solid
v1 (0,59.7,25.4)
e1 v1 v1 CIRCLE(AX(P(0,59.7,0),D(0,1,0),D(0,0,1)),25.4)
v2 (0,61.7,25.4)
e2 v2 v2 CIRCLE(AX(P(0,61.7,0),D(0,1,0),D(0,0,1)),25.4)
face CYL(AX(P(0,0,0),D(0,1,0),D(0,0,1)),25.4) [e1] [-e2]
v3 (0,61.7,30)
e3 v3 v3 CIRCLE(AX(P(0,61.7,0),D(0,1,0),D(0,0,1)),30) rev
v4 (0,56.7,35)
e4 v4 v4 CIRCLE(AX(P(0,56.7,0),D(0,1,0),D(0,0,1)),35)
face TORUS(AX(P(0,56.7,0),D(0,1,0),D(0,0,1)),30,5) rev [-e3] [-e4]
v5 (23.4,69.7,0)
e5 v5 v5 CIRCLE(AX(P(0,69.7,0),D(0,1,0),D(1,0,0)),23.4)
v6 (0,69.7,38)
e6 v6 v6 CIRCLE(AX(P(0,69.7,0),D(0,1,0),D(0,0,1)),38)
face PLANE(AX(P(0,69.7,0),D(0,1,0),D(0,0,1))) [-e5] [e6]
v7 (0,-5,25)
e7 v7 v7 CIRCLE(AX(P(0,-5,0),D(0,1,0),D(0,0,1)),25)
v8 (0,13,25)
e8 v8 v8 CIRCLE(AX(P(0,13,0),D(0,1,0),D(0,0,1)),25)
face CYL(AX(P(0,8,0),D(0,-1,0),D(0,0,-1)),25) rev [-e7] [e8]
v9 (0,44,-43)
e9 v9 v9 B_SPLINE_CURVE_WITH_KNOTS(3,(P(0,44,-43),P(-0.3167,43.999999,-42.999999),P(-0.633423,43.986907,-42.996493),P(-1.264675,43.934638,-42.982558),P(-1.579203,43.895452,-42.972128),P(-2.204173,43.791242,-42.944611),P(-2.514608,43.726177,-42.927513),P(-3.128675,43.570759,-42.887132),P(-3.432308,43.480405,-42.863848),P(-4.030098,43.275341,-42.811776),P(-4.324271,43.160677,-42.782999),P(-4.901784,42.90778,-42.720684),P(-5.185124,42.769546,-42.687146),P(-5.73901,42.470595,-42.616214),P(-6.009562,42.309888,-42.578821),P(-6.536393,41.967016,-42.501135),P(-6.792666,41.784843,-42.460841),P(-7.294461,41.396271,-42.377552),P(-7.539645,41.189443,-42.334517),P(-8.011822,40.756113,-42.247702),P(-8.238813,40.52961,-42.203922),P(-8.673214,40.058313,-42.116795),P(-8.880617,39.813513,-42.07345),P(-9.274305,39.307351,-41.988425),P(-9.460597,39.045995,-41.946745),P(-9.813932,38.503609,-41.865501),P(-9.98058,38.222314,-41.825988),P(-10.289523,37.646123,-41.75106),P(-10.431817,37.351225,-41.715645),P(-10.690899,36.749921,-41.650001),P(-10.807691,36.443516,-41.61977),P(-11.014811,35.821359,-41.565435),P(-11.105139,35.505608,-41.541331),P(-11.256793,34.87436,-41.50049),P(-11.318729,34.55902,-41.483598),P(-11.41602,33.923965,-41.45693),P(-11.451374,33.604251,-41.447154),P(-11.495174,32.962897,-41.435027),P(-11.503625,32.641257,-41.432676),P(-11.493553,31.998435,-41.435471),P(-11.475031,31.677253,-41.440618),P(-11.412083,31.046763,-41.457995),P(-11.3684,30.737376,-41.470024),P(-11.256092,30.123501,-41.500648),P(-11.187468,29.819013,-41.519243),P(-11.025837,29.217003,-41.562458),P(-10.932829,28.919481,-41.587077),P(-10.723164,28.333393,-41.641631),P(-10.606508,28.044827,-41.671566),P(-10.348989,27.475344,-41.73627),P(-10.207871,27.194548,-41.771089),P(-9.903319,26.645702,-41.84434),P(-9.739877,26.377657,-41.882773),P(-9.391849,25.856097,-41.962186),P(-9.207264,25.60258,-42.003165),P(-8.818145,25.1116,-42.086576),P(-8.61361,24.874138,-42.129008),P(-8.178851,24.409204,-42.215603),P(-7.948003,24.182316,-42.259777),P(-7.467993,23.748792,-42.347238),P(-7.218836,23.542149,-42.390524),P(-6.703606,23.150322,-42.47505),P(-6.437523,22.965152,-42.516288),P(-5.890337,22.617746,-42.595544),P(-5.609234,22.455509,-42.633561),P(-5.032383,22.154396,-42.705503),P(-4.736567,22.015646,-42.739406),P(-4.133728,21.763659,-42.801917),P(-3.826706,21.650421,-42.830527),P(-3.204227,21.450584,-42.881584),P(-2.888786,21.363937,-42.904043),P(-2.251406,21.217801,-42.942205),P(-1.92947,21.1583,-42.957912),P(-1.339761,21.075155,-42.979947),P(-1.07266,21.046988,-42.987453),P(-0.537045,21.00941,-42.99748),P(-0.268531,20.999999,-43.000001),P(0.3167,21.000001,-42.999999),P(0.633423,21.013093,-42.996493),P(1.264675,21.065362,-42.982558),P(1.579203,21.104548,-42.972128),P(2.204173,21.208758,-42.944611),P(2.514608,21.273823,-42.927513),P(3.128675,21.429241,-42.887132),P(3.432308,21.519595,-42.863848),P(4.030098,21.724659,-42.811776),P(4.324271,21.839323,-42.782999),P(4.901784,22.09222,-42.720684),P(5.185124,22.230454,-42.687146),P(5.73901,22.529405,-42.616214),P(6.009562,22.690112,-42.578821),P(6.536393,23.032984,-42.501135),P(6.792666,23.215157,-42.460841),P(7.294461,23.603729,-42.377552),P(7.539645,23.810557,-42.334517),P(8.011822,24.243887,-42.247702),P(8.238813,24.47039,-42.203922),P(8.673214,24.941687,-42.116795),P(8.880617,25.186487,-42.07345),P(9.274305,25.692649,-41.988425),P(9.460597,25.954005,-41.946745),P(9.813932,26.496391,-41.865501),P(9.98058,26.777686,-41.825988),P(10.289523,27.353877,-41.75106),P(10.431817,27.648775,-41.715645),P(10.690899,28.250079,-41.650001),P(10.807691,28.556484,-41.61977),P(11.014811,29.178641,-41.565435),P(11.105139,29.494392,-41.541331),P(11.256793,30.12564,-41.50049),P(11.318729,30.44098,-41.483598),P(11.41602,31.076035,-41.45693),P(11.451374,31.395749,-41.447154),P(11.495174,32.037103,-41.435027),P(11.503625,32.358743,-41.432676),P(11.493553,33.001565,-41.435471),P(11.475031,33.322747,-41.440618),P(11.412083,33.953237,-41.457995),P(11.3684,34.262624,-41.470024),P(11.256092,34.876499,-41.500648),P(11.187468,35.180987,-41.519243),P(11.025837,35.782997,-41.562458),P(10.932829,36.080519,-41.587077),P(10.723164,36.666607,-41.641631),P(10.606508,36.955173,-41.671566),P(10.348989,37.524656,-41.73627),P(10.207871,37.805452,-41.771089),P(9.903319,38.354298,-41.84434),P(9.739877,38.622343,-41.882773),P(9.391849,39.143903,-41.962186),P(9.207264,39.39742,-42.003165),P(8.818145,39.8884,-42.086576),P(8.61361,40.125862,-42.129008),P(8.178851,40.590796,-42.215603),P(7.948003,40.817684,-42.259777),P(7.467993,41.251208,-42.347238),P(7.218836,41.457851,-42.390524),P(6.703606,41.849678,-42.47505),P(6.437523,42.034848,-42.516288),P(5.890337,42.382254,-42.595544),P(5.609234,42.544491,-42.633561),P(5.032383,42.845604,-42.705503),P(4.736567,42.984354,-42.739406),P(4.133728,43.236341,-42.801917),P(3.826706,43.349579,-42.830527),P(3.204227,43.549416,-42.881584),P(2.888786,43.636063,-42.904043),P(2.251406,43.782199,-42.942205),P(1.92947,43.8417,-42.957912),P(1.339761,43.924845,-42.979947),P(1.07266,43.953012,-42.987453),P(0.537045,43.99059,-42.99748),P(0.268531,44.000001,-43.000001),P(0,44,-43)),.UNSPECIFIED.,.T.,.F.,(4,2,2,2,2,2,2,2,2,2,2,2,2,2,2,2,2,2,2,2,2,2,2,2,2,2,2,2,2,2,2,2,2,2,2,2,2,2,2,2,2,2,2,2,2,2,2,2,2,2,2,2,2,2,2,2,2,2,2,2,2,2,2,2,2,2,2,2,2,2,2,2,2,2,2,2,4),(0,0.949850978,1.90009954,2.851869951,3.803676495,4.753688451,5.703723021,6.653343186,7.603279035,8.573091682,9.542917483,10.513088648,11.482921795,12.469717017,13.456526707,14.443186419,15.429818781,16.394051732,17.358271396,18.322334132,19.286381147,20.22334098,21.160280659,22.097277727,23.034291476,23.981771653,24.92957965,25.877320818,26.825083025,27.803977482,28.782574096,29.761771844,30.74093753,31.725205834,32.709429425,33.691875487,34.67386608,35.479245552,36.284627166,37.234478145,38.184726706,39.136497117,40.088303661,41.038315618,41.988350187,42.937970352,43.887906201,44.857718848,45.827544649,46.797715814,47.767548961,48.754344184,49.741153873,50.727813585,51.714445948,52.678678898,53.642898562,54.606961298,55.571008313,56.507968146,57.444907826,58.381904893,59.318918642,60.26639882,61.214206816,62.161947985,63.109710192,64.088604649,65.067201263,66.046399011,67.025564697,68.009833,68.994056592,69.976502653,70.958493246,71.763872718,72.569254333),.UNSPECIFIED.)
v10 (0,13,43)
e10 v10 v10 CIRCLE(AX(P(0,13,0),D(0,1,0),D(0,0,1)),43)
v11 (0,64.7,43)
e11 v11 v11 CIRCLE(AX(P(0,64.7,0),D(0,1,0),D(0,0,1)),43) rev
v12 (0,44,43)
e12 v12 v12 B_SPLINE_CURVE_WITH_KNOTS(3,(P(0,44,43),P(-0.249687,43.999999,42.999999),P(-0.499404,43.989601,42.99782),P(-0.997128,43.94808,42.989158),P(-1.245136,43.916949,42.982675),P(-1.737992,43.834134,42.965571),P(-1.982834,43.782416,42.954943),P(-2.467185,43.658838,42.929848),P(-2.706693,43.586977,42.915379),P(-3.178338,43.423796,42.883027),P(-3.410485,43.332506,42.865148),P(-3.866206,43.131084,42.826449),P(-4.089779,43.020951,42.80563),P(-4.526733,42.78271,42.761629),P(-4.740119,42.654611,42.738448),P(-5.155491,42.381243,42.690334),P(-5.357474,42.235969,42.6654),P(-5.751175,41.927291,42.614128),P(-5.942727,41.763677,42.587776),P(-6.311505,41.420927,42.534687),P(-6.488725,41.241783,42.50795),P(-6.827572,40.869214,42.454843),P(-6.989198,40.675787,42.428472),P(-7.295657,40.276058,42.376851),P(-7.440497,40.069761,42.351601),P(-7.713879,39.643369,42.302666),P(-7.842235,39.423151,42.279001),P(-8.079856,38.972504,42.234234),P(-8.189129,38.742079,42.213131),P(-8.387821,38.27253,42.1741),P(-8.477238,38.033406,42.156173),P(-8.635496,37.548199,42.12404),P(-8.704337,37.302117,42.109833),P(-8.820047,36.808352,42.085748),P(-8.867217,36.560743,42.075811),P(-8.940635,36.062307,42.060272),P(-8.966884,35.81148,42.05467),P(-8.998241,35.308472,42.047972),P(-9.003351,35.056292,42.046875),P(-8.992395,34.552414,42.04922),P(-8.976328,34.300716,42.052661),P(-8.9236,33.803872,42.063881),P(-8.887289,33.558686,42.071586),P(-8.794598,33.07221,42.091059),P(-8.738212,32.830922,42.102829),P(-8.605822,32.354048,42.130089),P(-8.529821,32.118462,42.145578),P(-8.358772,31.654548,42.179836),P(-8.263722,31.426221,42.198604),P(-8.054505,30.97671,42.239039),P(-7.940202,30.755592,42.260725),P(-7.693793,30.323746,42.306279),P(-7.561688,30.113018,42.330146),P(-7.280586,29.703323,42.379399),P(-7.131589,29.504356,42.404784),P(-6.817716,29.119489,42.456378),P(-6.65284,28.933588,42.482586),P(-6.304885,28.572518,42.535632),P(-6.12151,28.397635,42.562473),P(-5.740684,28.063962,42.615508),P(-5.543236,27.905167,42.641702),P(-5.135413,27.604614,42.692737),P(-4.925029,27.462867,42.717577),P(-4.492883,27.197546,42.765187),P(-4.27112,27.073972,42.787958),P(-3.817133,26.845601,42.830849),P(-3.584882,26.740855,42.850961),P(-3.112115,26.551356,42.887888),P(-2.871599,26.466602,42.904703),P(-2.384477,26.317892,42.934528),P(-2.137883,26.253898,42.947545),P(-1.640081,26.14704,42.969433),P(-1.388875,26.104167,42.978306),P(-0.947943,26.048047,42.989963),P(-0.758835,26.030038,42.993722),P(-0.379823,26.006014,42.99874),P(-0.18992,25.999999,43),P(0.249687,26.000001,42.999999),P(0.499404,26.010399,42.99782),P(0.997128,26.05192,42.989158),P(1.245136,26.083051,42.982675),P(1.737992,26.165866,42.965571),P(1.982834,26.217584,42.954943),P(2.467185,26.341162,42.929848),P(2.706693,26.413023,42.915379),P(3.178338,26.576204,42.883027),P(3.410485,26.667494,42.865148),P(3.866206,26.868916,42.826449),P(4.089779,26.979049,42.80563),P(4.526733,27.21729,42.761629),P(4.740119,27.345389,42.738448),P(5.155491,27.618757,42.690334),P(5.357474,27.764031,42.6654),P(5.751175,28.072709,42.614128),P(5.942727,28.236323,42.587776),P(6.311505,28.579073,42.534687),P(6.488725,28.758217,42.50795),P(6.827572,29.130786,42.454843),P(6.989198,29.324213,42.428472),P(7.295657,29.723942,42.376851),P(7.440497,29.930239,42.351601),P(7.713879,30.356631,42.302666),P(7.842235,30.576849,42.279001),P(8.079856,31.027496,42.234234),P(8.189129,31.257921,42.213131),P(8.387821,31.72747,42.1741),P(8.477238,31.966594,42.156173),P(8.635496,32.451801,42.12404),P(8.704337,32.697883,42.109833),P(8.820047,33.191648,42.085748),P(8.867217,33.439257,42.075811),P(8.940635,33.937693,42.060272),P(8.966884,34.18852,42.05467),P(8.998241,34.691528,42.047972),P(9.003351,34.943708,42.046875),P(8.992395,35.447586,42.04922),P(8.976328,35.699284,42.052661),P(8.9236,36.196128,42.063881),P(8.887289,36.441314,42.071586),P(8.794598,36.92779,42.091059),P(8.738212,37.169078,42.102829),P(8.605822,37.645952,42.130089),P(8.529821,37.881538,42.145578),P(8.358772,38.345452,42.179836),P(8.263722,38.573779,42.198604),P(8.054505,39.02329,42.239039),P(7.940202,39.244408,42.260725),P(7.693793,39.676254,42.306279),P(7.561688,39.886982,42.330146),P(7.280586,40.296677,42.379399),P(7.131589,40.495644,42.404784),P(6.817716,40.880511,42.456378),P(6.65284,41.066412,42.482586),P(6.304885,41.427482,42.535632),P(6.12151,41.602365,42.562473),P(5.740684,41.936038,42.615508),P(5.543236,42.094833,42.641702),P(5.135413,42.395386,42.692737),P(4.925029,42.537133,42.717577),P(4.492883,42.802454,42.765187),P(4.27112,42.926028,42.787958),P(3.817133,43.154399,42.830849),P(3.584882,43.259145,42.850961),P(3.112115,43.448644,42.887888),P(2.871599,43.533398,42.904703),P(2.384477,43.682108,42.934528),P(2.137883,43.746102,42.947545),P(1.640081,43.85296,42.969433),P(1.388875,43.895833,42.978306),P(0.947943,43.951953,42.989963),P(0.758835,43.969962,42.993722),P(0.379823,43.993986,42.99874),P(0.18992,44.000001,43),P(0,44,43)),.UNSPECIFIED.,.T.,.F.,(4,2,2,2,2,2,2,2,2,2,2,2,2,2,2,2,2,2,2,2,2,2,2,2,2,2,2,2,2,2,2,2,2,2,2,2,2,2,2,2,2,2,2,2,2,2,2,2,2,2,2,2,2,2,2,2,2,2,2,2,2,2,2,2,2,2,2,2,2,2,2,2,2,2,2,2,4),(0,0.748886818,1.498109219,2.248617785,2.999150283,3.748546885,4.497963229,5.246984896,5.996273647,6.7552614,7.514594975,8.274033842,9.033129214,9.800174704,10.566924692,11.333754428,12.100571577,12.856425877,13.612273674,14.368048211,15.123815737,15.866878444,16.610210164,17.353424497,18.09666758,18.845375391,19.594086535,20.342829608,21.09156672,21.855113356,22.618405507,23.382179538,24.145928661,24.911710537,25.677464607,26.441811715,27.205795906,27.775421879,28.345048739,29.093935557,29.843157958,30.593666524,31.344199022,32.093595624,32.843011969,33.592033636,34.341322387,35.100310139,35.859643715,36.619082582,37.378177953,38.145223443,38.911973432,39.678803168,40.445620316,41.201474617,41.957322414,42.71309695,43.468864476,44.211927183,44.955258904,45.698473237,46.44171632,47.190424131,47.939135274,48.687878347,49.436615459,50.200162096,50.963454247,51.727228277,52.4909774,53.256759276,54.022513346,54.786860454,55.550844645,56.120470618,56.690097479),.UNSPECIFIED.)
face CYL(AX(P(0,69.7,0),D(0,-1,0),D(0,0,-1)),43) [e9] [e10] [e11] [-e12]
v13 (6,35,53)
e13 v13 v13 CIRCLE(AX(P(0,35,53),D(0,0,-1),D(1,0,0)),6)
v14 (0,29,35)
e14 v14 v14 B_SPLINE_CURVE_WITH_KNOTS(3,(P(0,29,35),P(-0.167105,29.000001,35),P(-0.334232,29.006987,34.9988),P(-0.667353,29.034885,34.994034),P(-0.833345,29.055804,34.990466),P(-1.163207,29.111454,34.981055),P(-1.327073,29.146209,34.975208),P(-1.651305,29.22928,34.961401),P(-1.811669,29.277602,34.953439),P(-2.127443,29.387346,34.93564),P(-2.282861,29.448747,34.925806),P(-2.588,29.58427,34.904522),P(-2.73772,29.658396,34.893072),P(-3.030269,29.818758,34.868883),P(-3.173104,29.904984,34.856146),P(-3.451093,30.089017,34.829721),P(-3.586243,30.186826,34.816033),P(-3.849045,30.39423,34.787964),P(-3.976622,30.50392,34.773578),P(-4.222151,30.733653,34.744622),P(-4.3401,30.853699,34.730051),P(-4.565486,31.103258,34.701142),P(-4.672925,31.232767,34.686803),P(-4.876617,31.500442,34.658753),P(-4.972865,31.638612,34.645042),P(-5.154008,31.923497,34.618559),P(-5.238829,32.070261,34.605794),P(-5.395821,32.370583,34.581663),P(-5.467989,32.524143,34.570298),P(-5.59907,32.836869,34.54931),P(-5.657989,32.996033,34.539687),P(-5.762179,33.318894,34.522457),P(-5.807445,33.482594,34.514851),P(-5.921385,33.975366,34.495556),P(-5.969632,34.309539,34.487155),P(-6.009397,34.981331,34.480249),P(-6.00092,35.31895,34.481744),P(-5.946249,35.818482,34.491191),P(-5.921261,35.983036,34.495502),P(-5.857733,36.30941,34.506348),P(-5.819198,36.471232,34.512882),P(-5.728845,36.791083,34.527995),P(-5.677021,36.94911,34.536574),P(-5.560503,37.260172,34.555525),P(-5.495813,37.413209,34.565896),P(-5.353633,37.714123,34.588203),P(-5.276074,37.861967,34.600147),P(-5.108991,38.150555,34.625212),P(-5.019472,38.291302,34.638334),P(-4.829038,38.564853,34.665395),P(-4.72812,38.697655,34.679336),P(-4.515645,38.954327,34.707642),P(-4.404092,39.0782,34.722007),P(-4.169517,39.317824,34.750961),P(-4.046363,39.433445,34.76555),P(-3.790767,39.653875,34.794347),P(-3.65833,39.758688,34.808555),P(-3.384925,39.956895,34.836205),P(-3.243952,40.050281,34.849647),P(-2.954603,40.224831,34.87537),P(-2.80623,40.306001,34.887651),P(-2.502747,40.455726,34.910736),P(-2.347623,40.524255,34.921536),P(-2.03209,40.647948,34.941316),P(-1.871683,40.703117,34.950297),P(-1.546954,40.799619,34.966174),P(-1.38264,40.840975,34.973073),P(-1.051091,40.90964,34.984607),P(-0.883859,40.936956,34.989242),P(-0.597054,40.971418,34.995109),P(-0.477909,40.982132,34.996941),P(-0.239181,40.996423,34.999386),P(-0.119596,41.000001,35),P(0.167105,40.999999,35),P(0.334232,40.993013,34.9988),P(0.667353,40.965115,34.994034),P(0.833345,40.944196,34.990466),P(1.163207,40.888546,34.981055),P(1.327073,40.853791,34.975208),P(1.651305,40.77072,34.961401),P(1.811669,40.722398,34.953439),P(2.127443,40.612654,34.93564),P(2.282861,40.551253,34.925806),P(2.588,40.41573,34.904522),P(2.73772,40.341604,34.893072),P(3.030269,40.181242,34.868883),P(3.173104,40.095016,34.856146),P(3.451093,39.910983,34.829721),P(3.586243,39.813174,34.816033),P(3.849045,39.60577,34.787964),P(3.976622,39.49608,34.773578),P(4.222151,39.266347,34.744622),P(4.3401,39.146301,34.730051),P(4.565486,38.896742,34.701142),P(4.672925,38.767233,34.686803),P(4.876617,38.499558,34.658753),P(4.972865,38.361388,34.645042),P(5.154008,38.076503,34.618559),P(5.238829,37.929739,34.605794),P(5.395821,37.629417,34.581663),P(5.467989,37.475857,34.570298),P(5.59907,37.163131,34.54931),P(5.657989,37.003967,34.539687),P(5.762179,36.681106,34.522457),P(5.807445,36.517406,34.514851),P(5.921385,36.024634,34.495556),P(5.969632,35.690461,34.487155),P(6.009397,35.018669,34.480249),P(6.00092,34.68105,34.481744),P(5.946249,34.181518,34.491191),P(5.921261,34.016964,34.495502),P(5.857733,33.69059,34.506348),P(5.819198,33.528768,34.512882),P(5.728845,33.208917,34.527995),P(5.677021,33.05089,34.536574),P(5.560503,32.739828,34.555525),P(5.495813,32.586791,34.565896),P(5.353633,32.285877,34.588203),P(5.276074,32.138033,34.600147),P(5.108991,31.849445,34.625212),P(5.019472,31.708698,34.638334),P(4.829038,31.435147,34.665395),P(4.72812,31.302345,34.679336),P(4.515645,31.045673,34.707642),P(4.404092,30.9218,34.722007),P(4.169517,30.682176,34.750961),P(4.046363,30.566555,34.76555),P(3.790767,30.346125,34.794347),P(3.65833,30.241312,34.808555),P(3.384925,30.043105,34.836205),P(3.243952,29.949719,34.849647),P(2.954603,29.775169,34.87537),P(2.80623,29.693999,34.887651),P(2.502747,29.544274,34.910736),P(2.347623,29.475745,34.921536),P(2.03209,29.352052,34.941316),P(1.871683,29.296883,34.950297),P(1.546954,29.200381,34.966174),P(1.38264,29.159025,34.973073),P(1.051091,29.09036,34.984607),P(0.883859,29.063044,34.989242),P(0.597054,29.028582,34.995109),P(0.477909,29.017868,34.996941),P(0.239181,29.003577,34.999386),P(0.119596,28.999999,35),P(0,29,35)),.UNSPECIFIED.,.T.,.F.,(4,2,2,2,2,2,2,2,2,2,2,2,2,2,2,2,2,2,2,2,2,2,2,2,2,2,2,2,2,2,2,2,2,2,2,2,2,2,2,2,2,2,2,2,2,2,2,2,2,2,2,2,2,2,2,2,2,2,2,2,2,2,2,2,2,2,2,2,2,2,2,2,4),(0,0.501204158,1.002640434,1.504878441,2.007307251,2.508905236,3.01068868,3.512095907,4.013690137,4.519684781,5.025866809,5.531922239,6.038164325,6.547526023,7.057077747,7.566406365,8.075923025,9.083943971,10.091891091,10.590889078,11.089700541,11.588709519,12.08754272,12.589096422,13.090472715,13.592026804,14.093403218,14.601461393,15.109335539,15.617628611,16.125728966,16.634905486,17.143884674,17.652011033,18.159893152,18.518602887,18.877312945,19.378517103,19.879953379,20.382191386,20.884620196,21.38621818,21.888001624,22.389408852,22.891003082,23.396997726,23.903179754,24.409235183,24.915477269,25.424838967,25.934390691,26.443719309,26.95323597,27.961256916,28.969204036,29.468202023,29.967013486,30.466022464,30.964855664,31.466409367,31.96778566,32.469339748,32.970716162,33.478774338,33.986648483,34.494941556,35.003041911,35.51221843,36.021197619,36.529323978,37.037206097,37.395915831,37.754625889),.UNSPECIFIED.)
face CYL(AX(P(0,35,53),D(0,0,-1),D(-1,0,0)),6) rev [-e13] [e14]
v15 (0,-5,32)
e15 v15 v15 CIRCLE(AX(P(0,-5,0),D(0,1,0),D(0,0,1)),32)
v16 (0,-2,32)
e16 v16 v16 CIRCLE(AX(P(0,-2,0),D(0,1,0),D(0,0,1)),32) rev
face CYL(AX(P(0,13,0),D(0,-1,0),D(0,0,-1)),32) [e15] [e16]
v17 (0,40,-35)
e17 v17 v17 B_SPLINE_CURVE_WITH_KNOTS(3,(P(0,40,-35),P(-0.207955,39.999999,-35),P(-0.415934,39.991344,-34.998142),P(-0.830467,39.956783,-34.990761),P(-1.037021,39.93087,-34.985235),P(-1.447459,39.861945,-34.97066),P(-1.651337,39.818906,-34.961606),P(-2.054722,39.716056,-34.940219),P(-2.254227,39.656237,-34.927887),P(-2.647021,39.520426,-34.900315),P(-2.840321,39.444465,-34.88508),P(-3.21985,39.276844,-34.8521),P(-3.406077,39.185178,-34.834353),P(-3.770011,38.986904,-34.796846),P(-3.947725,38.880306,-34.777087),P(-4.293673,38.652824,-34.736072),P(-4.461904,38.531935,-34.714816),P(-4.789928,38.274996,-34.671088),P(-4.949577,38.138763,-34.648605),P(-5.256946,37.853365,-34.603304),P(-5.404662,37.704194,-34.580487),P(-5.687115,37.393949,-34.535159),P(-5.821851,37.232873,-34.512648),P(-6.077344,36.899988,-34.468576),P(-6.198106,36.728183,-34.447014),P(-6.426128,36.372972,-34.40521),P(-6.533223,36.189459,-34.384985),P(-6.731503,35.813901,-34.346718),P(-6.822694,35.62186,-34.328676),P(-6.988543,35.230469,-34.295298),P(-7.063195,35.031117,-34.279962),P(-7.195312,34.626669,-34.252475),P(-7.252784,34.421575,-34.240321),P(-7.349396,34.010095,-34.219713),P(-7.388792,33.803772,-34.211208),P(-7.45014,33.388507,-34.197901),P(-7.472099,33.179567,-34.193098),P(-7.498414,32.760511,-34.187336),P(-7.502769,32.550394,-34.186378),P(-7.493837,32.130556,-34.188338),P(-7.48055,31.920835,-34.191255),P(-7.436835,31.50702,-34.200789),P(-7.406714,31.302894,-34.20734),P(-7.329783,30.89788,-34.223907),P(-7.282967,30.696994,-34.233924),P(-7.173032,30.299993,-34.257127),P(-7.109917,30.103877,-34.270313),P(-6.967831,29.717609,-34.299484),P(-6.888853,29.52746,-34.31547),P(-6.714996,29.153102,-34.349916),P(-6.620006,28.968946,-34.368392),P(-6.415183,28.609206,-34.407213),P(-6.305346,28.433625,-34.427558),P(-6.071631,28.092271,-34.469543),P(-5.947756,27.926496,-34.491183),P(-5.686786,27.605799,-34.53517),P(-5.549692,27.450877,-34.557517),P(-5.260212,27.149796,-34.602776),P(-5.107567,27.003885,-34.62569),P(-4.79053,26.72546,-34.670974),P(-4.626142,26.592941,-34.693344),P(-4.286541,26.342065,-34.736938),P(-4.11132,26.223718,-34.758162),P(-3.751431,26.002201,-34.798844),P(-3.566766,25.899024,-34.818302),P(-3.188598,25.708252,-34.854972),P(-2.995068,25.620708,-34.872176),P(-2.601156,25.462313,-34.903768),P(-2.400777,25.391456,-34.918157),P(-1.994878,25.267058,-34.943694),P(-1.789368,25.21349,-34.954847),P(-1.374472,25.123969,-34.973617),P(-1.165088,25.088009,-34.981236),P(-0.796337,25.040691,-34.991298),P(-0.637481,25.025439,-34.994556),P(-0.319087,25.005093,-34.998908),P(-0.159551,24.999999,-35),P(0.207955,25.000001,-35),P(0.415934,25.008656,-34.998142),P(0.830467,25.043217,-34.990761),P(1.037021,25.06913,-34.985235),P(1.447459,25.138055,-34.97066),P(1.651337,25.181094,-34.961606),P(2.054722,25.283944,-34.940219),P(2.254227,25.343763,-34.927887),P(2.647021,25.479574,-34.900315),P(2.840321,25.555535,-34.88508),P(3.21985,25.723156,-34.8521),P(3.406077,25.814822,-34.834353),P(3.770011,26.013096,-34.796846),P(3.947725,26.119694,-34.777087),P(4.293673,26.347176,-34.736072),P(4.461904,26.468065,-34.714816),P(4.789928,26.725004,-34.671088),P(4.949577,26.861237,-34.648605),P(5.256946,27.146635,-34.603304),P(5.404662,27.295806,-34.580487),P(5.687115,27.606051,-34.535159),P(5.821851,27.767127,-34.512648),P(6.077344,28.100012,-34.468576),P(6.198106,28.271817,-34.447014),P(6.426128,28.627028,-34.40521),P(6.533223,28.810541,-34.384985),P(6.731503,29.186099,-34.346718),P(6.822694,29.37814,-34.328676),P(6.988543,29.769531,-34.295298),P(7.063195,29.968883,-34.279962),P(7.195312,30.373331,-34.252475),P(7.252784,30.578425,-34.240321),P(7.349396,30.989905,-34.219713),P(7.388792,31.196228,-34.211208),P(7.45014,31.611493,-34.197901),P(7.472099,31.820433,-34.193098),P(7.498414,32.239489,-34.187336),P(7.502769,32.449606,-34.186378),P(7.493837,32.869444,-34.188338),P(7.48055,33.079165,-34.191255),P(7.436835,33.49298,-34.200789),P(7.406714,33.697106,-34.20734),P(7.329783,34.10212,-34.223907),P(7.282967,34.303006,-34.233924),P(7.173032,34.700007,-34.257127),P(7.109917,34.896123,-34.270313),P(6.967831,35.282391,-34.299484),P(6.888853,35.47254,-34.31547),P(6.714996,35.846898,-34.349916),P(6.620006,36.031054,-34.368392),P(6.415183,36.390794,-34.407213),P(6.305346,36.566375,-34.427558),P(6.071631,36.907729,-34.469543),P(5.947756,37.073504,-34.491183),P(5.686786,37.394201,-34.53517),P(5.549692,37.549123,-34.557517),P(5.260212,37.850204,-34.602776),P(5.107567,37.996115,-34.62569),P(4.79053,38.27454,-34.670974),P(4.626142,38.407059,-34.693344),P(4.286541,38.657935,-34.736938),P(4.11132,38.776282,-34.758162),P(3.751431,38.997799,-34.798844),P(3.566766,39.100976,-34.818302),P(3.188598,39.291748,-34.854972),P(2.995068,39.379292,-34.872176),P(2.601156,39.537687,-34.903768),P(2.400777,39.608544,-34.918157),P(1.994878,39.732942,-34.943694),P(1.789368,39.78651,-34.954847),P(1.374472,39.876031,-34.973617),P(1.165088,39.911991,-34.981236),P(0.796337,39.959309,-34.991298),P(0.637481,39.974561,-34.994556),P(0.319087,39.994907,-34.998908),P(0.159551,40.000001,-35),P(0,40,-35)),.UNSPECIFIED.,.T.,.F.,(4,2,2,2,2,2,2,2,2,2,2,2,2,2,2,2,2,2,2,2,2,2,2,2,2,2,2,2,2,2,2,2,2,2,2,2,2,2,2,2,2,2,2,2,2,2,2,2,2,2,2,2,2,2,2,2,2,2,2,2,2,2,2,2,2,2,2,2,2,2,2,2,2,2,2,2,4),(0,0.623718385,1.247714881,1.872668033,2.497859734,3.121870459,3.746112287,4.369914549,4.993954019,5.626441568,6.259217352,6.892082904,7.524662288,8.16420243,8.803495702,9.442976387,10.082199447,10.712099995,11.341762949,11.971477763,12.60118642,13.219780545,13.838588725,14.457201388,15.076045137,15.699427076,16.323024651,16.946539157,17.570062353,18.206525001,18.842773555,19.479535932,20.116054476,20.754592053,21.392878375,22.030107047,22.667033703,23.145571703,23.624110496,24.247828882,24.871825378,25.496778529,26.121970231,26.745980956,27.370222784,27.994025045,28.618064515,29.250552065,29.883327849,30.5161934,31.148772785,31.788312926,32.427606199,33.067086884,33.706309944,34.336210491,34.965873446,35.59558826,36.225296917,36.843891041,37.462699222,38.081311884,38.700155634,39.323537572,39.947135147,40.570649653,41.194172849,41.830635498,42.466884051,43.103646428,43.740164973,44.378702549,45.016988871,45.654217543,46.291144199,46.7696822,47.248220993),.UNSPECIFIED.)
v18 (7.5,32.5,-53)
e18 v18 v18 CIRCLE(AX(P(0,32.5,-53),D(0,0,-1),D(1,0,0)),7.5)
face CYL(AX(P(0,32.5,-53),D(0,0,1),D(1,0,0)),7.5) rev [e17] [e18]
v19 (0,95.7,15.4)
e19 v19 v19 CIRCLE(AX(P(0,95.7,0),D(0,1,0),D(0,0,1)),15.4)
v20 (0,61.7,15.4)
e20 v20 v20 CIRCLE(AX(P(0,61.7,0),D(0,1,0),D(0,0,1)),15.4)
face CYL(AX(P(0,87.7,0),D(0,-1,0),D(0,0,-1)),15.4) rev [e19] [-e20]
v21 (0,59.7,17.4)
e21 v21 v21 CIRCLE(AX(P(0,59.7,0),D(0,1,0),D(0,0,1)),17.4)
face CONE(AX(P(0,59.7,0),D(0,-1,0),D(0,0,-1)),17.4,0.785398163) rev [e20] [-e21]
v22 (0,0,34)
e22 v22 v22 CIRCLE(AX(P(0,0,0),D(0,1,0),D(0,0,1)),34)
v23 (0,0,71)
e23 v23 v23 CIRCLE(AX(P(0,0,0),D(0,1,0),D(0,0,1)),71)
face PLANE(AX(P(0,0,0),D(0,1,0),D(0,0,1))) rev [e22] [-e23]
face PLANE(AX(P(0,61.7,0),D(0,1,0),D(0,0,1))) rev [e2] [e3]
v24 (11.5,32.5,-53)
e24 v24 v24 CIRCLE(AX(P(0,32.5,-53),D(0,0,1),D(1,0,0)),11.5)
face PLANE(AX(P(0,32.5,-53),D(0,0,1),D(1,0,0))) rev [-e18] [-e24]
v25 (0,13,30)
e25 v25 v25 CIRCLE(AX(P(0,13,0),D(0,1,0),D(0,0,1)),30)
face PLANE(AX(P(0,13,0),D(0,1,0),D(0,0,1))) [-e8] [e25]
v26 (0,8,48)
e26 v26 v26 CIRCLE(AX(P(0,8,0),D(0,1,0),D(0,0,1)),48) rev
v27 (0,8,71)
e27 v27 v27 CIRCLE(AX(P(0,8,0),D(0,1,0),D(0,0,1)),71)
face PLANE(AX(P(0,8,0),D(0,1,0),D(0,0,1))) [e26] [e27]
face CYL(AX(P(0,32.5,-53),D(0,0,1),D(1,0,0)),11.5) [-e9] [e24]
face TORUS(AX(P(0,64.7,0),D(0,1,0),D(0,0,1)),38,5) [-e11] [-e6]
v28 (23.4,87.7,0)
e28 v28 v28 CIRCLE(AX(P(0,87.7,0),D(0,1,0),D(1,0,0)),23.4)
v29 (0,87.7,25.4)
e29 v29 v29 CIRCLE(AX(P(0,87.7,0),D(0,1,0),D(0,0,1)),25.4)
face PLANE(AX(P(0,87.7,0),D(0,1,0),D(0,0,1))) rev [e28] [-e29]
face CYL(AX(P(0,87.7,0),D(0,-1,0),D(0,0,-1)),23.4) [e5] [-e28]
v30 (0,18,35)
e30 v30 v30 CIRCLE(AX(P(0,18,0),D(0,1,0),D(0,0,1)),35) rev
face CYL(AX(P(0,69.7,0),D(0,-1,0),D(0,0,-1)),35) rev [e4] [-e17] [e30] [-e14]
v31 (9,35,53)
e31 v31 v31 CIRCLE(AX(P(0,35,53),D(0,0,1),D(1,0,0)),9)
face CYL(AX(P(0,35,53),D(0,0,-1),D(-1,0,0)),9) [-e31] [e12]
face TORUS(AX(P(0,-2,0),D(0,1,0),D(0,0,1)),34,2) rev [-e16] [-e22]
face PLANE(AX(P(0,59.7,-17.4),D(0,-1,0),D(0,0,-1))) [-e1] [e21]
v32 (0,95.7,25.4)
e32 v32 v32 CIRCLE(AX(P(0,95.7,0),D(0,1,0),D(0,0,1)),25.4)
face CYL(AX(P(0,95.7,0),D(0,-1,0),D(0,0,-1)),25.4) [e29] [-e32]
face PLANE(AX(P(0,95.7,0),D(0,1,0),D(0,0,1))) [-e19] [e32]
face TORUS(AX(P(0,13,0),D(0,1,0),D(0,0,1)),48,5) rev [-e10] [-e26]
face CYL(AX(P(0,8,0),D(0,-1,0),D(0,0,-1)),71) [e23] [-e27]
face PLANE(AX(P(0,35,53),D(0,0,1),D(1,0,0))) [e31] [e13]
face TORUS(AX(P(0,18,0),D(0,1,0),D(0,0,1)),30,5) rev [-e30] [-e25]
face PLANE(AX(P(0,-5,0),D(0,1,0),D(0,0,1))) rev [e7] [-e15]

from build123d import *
from build123d.topology import SkipClean

# Parameters (mm, degrees)
CROQUIS2_R              = 71
CROQUIS2_R_2            = 25
SALIENTE_EXTRUIR2_DEPTH = 8
CROQUIS6_R              = 32
CROQUIS6_R_2            = 25
SALIENTE_EXTRUIR3_DEPTH = 18
REDONDEO1_R             = 2
CROQUIS7_R              = 43
CROQUIS7_R_2            = 35
EXTRUIR_L_MINA2_DEPTH   = 61.7
REDONDEO2_R             = 5
SALIENTE_EXTRUIR6_START = -8
CROQUIS16_R             = 43
SALIENTE_EXTRUIR6_DEPTH = 8
REDONDEO4_R             = 5
CROQUIS17_R             = 23.4
CROQUIS17_R_2           = 15.4
EXTRUIR_L_MINA3_DEPTH   = 18
CROQUIS18_R             = 25.4
SALIENTE_EXTRUIR7_DEPTH = 8
CROQUIS19_R             = 15.4
CORTAR_EXTRUIR3_DEPTH   = 60
CROQUIS20_W             = 75.22649233
CROQUIS20_H             = 104.996756407
CORTAR_EXTRUIR4_DEPTH   = 75
REDONDEO6_R             = 5
REVOLUCI_N4_ANGLE       = 180
SALIENTE_EXTRUIR8_DEPTH = 13
CORTAR_EXTRUIR5_DEPTH   = 6.5
SALIENTE_EXTRUIR9_DEPTH = 13
CROQUIS27_R             = 6
CORTAR_EXTRUIR7_DEPTH   = 6.5


with BuildPart() as part:
    # Croquis2 → Saliente-Extruir2 (new body)
    with BuildSketch(Plane(origin=(0, 0, 0), x_dir=(1, 0, 0), z_dir=(0, 1, 0))):
        with Locations(Location((0, 0, 0), (0, 0, 270))):
            Circle(CROQUIS2_R)
        with Locations(Location((0, 0, 0), (0, 0, 270))):
            Circle(CROQUIS2_R_2, mode=Mode.SUBTRACT)
    extrude(amount=SALIENTE_EXTRUIR2_DEPTH)

    # Croquis6 → Saliente-Extruir3 (add)
    with BuildSketch(Plane(origin=(0, -5, 0), x_dir=(1, 0, 0), z_dir=(0, 1, 0))):
        with Locations(Location((0, 0, 0), (0, 0, 270))):
            Circle(CROQUIS6_R)
        with Locations(Location((0, 0, 0), (0, 0, 270))):
            Circle(CROQUIS6_R_2, mode=Mode.SUBTRACT)
    extrude(amount=SALIENTE_EXTRUIR3_DEPTH)

    # Redondeo1
    redondeo1_edges = [part.edges().sort_by_distance(p)[0] for p in [
        (0, 0, -32),
    ]]
    fillet(redondeo1_edges, radius=REDONDEO1_R)

    # Croquis7 → Extruir-Lámina2 (add)
    with BuildSketch(Plane(origin=(0, 8, 0), x_dir=(1, 0, 0), z_dir=(0, 1, 0))):
        Circle(CROQUIS7_R)
        Circle(CROQUIS7_R_2, mode=Mode.SUBTRACT)
    extrude(amount=EXTRUIR_L_MINA2_DEPTH)

    # Redondeo2
    redondeo2_edges = [part.edges().sort_by_distance(p)[0] for p in [
        (-43, 8, 0),
    ]]
    fillet(redondeo2_edges, radius=REDONDEO2_R)

    # Redondeo3: read off the stored shape, not the designer's step
    # Redondeo3 outline → Redondeo3 (revolve)
    with BuildSketch(Plane.XY):
        with BuildLine():
            Line((30, 13), (32, 13))
            Line((32, 13), (32, 8))
            Line((32, 8), (35, 8))
            Line((35, 8), (35, 18))
            ThreePointArc((35, 18), (33.535533906, 14.464466094), (30, 13))
        make_face()
    revolve(axis=Axis((0, 0, 0), (0, 1, 0)))

    # Croquis16 → Saliente-Extruir6 (add)
    with BuildSketch(Plane(origin=(0, 69.7, 0), x_dir=(1, 0, 0), z_dir=(0, 1, 0)).offset(SALIENTE_EXTRUIR6_START)):
        Circle(CROQUIS16_R)
    extrude(amount=SALIENTE_EXTRUIR6_DEPTH)

    # Redondeo4
    redondeo4_edges = [part.edges().sort_by_distance(p)[0] for p in [
        (-43, 69.7, 0),
    ]]
    fillet(redondeo4_edges, radius=REDONDEO4_R)

    # Croquis17 → Extruir-Lámina3 (add)
    with BuildSketch(Plane(origin=(0, 69.7, 0), x_dir=(1, 0, 0), z_dir=(0, 1, 0))):
        Circle(CROQUIS17_R)
        Circle(CROQUIS17_R_2, mode=Mode.SUBTRACT)
    extrude(amount=EXTRUIR_L_MINA3_DEPTH)

    # Croquis18 → Saliente-Extruir7 (add)
    with BuildSketch(Plane(origin=(0, 87.7, 0), x_dir=(1, 0, 0), z_dir=(0, 1, 0))):
        with Locations(Location((0, 0, 0), (0, 0, 270))):
            Circle(CROQUIS18_R)
    extrude(amount=SALIENTE_EXTRUIR7_DEPTH)

    # Croquis19 → Cortar-Extruir3 (cut, symmetric)
    with SkipClean():  # the faces are left unmerged after this step: merging them gives an invalid solid
        with BuildSketch(Plane(origin=(0, 95.7, 0), x_dir=(1, 0, 0), z_dir=(0, 1, 0))):
            with Locations(Location((0, 0, 0), (0, 0, 270))):
                Circle(CROQUIS19_R)
        extrude(amount=CORTAR_EXTRUIR3_DEPTH, both=True, mode=Mode.SUBTRACT)

    # Croquis20 → Cortar-Extruir4 (cut, symmetric)
    with BuildSketch(Plane.XY):
        with Locations((37.613246165, 47.498378204)):
            Rectangle(CROQUIS20_W, CROQUIS20_H)
    extrude(amount=CORTAR_EXTRUIR4_DEPTH, both=True, mode=Mode.SUBTRACT)

    # Redondeo6
    redondeo6_edges = [part.edges().sort_by_distance(p)[0] for p in [
        (-35, 61.7, 0),
    ]]
    fillet(redondeo6_edges, radius=REDONDEO6_R)

    # Croquis21 → Revolución4 (revolve)
    with BuildSketch(Plane(origin=(0, 0, 0), x_dir=(0, 0, -1), z_dir=(1, 0, 0))):
        Polygon((-15.4, 61.7), (-17.4, 59.7), (-25.4, 59.7), (-25.4, 61.7), align=None)
    revolve(axis=Axis((0, 0, 0), (0, -1, 0)), revolution_arc=REVOLUCI_N4_ANGLE)

    # Croquis22 → Saliente-Extruir8 (add)
    with BuildSketch(Plane.XY.offset(-40)):
        with BuildLine():
            Line((0, 44), (0, 40))
            ThreePointArc((0, 40), (-7.5, 32.5), (0, 25))
            Line((0, 25), (0, 21))
            ThreePointArc((0, 21), (-11.5, 32.5), (0, 44))
        make_face()
    extrude(amount=-SALIENTE_EXTRUIR8_DEPTH)

    # Croquis24 → Cortar-Extruir5 (cut, symmetric)
    with BuildSketch(Plane.XY.offset(-40)):
        with BuildLine():
            Line((0, 40), (0, 25))
            ThreePointArc((0, 25), (-7.5, 32.5), (0, 40))
        make_face()
    extrude(amount=CORTAR_EXTRUIR5_DEPTH, both=True, mode=Mode.SUBTRACT)

    # Croquis25 → Saliente-Extruir9 (add)
    with BuildSketch(Plane.XY.offset(40)):
        with BuildLine():
            Line((0, 44), (0, 41))
            ThreePointArc((0, 41), (-6, 35), (0, 29))
            Line((0, 29), (0, 26))
            ThreePointArc((0, 26), (-9, 35), (0, 44))
        make_face()
    extrude(amount=SALIENTE_EXTRUIR9_DEPTH)

    # Croquis27 → Cortar-Extruir7 (cut, symmetric)
    with BuildSketch(Plane.XY.offset(40)):
        with Locations((0, 35)):
            Circle(CROQUIS27_R)
    extrude(amount=CORTAR_EXTRUIR7_DEPTH, both=True, mode=Mode.SUBTRACT)

    # Simetría1: part across plane


with BuildPart() as part_1:
    with SkipClean():  # the faces are left unmerged after this step: merging them gives an invalid solid
        add(part.part)
        add(part.part.mirror(Plane(origin=(0, 0, 0), x_dir=(0, 0, 1), z_dir=(1, 0, 0))))


solid = part_1.part
